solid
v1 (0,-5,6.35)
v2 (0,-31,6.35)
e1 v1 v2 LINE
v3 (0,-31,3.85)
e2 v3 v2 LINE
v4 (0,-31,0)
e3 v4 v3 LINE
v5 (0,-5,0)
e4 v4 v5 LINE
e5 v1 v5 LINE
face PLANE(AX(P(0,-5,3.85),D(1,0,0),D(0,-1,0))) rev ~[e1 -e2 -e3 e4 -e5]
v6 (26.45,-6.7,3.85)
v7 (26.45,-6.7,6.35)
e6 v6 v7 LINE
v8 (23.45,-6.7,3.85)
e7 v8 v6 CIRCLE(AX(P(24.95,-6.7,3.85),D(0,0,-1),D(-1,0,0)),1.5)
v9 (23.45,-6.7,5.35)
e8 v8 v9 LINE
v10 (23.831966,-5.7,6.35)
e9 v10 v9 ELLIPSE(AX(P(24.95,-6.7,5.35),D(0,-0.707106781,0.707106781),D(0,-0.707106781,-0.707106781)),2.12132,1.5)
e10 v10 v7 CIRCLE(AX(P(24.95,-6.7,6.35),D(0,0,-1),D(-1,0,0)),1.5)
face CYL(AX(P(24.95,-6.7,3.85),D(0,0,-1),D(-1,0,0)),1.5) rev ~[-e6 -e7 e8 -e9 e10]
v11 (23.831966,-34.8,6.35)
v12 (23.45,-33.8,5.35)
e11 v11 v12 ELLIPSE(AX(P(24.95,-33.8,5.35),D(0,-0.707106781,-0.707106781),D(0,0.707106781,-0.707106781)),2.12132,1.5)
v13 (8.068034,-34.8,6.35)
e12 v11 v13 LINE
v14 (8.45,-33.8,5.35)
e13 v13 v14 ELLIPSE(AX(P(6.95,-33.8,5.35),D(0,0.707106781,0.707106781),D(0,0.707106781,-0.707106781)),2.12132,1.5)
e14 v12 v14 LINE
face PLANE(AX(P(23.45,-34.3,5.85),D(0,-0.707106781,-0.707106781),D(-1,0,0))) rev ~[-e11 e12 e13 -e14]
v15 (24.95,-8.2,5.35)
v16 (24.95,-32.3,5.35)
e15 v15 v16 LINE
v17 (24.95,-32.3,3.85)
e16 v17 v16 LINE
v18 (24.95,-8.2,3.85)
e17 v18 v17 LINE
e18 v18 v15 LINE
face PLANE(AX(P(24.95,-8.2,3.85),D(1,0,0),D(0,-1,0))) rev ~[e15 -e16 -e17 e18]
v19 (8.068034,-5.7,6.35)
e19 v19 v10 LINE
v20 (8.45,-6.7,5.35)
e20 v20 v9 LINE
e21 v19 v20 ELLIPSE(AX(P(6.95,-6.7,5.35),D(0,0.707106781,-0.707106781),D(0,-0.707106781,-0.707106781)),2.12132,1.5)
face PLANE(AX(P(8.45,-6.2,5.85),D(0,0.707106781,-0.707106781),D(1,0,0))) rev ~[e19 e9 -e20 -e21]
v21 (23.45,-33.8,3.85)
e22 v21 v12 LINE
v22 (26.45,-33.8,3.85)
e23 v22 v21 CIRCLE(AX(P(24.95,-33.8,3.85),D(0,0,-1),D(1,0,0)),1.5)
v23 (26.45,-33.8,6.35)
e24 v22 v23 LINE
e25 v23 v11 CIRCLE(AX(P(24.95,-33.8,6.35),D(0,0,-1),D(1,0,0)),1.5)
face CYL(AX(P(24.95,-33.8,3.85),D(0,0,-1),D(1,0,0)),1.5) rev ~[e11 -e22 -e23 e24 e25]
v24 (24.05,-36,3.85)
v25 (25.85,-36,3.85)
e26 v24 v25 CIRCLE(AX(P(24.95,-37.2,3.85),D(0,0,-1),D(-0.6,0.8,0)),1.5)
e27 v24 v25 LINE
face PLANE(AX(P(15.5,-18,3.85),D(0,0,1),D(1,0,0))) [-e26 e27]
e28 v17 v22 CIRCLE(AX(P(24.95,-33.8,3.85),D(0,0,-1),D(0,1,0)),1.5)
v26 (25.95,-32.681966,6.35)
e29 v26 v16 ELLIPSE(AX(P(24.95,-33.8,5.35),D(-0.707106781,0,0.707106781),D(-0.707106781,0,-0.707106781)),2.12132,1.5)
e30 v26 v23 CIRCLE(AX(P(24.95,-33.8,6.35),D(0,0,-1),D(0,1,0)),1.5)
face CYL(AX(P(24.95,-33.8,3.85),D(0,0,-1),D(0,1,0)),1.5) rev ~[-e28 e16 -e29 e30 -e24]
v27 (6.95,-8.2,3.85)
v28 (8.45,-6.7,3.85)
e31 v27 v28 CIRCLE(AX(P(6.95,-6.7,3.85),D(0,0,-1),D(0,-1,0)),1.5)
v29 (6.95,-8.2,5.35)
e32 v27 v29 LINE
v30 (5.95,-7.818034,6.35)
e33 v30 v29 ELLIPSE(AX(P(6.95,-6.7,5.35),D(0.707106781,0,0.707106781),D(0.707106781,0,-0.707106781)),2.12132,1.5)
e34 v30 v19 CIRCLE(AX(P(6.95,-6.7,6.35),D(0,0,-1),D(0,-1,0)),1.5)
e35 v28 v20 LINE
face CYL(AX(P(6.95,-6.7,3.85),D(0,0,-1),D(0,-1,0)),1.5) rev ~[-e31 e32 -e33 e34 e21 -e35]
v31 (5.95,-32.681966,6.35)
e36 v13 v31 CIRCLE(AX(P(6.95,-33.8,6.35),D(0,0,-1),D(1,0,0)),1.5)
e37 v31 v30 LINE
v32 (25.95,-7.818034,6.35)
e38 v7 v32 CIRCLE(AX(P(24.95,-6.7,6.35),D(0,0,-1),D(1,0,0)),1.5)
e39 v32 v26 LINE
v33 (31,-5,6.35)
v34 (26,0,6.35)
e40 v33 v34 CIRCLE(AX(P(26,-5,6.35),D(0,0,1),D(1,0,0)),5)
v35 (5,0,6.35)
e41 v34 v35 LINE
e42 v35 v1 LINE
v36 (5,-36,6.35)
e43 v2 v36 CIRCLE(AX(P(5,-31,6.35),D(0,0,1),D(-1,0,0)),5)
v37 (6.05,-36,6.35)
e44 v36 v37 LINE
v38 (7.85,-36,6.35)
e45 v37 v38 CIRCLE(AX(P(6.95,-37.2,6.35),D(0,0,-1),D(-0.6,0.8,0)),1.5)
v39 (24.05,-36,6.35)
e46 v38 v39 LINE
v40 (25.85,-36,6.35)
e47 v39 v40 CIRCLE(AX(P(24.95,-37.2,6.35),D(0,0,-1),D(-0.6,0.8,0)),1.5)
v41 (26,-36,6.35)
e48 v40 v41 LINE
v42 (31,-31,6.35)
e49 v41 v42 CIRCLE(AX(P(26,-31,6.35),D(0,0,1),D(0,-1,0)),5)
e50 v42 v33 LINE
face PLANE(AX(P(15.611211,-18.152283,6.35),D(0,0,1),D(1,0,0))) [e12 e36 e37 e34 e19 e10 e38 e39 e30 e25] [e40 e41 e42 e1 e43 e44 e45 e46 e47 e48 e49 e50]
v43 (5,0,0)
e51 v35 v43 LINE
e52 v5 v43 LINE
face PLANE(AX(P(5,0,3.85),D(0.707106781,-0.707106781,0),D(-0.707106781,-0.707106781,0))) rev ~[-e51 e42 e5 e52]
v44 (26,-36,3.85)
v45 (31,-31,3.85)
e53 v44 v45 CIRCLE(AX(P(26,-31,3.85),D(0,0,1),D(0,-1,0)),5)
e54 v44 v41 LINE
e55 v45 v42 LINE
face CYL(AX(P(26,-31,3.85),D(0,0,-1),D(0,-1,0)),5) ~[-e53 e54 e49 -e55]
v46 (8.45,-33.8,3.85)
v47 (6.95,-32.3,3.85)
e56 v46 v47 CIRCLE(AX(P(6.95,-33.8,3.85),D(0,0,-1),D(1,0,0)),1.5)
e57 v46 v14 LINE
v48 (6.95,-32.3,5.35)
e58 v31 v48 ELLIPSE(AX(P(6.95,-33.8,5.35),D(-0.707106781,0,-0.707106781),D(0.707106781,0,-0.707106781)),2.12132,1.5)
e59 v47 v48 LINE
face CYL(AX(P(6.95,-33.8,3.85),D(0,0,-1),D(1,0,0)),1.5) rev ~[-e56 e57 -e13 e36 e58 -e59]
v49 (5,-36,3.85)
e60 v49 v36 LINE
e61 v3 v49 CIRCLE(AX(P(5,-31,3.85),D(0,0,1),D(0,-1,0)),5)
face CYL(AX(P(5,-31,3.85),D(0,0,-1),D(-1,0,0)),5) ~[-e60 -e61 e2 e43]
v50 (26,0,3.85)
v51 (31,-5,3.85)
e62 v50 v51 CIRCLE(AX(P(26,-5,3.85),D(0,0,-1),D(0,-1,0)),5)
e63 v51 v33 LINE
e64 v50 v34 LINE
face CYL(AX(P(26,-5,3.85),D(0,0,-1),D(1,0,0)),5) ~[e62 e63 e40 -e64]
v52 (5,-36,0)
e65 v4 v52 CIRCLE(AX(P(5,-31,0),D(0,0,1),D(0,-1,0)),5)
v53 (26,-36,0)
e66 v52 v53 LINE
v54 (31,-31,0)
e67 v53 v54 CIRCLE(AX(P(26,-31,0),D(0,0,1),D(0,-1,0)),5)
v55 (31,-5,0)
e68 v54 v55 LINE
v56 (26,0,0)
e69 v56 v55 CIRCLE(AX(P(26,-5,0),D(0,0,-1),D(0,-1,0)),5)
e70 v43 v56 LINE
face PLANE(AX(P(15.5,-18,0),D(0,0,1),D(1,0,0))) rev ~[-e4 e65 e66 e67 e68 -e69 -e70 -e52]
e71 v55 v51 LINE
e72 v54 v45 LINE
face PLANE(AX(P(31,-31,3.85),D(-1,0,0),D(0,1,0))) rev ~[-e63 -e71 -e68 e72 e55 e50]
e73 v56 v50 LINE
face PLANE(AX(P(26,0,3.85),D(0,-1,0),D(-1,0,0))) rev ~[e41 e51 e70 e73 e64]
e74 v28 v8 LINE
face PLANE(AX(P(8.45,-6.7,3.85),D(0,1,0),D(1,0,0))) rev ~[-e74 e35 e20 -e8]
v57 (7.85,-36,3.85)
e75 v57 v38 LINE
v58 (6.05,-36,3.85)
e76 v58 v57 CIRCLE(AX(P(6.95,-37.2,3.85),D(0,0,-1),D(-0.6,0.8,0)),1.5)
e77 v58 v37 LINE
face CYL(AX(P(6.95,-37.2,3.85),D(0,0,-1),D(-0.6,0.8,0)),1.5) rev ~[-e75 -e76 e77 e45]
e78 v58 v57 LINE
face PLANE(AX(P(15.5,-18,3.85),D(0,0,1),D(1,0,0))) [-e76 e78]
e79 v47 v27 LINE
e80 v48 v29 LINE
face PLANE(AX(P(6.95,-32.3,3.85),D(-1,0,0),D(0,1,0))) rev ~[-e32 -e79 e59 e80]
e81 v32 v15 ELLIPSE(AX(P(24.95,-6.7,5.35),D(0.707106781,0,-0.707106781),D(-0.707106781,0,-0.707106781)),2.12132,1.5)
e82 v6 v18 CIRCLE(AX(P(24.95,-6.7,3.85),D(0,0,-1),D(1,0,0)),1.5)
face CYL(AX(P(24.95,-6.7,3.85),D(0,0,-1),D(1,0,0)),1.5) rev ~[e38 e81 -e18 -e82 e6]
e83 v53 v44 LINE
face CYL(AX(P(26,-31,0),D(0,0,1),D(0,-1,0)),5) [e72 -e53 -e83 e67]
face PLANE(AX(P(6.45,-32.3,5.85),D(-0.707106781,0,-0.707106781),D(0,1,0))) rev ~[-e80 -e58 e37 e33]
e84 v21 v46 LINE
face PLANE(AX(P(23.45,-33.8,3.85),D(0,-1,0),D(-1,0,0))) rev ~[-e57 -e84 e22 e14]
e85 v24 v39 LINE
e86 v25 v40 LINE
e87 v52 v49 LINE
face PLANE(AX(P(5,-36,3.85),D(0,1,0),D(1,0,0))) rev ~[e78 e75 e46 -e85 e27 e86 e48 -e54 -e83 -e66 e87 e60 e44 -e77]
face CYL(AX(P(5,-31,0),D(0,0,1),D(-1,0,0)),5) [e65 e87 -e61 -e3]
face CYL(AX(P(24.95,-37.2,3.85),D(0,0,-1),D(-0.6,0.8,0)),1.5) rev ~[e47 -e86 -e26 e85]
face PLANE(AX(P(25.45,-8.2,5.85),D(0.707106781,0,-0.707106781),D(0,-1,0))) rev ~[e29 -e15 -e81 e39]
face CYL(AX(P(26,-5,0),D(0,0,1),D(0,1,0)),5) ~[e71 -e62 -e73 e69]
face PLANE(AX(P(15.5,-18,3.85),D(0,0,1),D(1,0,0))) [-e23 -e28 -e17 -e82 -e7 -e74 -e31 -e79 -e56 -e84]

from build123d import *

# Parameters (mm, degrees)
F0_W     = 31
F0_H     = 36
F1_DEPTH = 3.85
F2_SIZE2 = 5
F2_SIZE  = 5
F3_R     = 5
F5_DEPTH = 2.5
F6_SIZE  = 1


with BuildPart() as f1:
    # F0 (on Top) → F1 (new body)
    with BuildSketch(Plane.XY):
        with Locations((15.5, -18)):
            Rectangle(F0_W, F0_H)
    extrude(amount=F1_DEPTH)

    # F2
    f2_edges = [f1.edges().sort_by_distance(p)[0] for p in [
        (0, 0, 1.925),
    ]]
    chamfer(f2_edges, length=F2_SIZE, length2=F2_SIZE2)

    # F3
    f3_edges = [f1.edges().sort_by_distance(p)[0] for p in [
        (31, 0, 1.925),
        (31, -36, 1.925),
        (0, -36, 1.925),
    ]]
    fillet(f3_edges, radius=F3_R)

    # F4 (on face) → F5 (join)
    with BuildSketch(Plane.XY.offset(3.85)):
        with BuildLine():
            Line((5, -36), (6.05, -36))
            ThreePointArc((6.05, -36), (6.95, -35.7), (7.85, -36))
            Line((7.85, -36), (24.05, -36))
            ThreePointArc((24.05, -36), (24.95, -35.7), (25.85, -36))
            Line((25.85, -36), (26, -36))
            ThreePointArc((26, -36), (29.5355339059, -34.5355339059), (31, -31))
            Line((31, -31), (31, -5))
            ThreePointArc((31, -5), (29.5355339059, -1.4644660941), (26, 0))
            Line((26, 0), (5, 0))
            Line((5, 0), (0, -5))
            Line((0, -5), (0, -31))
            ThreePointArc((0, -31), (1.4644660941, -34.5355339059), (5, -36))
        make_face()
        with BuildLine():
            Line((23.45, -33.8), (8.45, -33.8))
            ThreePointArc((8.45, -33.8), (5.8893398282, -34.8606601718), (6.95, -32.3))
            Line((6.95, -32.3), (6.95, -8.2))
            ThreePointArc((6.95, -8.2), (5.8893398282, -5.6393398282), (8.45, -6.7))
            Line((8.45, -6.7), (23.45, -6.7))
            ThreePointArc((23.45, -6.7), (24.95, -5.2), (26.45, -6.7))
            ThreePointArc((26.45, -6.7), (26.0106601718, -7.7606601718), (24.95, -8.2))
            Line((24.95, -8.2), (24.95, -32.3))
            ThreePointArc((24.95, -32.3), (26.0106601718, -32.7393398282), (26.45, -33.8))
            ThreePointArc((26.45, -33.8), (24.95, -35.3), (23.45, -33.8))
        make_face(mode=Mode.SUBTRACT)
    extrude(amount=F5_DEPTH)

    # F6
    f6_edges = [f1.edges().sort_by_distance(p)[0] for p in [
        (6.95, -20.25, 6.35),
        (15.95, -6.7, 6.35),
        (24.95, -20.25, 6.35),
        (15.95, -33.8, 6.35),
    ]]
    chamfer(f6_edges, length=F6_SIZE)


solid = f1.part
